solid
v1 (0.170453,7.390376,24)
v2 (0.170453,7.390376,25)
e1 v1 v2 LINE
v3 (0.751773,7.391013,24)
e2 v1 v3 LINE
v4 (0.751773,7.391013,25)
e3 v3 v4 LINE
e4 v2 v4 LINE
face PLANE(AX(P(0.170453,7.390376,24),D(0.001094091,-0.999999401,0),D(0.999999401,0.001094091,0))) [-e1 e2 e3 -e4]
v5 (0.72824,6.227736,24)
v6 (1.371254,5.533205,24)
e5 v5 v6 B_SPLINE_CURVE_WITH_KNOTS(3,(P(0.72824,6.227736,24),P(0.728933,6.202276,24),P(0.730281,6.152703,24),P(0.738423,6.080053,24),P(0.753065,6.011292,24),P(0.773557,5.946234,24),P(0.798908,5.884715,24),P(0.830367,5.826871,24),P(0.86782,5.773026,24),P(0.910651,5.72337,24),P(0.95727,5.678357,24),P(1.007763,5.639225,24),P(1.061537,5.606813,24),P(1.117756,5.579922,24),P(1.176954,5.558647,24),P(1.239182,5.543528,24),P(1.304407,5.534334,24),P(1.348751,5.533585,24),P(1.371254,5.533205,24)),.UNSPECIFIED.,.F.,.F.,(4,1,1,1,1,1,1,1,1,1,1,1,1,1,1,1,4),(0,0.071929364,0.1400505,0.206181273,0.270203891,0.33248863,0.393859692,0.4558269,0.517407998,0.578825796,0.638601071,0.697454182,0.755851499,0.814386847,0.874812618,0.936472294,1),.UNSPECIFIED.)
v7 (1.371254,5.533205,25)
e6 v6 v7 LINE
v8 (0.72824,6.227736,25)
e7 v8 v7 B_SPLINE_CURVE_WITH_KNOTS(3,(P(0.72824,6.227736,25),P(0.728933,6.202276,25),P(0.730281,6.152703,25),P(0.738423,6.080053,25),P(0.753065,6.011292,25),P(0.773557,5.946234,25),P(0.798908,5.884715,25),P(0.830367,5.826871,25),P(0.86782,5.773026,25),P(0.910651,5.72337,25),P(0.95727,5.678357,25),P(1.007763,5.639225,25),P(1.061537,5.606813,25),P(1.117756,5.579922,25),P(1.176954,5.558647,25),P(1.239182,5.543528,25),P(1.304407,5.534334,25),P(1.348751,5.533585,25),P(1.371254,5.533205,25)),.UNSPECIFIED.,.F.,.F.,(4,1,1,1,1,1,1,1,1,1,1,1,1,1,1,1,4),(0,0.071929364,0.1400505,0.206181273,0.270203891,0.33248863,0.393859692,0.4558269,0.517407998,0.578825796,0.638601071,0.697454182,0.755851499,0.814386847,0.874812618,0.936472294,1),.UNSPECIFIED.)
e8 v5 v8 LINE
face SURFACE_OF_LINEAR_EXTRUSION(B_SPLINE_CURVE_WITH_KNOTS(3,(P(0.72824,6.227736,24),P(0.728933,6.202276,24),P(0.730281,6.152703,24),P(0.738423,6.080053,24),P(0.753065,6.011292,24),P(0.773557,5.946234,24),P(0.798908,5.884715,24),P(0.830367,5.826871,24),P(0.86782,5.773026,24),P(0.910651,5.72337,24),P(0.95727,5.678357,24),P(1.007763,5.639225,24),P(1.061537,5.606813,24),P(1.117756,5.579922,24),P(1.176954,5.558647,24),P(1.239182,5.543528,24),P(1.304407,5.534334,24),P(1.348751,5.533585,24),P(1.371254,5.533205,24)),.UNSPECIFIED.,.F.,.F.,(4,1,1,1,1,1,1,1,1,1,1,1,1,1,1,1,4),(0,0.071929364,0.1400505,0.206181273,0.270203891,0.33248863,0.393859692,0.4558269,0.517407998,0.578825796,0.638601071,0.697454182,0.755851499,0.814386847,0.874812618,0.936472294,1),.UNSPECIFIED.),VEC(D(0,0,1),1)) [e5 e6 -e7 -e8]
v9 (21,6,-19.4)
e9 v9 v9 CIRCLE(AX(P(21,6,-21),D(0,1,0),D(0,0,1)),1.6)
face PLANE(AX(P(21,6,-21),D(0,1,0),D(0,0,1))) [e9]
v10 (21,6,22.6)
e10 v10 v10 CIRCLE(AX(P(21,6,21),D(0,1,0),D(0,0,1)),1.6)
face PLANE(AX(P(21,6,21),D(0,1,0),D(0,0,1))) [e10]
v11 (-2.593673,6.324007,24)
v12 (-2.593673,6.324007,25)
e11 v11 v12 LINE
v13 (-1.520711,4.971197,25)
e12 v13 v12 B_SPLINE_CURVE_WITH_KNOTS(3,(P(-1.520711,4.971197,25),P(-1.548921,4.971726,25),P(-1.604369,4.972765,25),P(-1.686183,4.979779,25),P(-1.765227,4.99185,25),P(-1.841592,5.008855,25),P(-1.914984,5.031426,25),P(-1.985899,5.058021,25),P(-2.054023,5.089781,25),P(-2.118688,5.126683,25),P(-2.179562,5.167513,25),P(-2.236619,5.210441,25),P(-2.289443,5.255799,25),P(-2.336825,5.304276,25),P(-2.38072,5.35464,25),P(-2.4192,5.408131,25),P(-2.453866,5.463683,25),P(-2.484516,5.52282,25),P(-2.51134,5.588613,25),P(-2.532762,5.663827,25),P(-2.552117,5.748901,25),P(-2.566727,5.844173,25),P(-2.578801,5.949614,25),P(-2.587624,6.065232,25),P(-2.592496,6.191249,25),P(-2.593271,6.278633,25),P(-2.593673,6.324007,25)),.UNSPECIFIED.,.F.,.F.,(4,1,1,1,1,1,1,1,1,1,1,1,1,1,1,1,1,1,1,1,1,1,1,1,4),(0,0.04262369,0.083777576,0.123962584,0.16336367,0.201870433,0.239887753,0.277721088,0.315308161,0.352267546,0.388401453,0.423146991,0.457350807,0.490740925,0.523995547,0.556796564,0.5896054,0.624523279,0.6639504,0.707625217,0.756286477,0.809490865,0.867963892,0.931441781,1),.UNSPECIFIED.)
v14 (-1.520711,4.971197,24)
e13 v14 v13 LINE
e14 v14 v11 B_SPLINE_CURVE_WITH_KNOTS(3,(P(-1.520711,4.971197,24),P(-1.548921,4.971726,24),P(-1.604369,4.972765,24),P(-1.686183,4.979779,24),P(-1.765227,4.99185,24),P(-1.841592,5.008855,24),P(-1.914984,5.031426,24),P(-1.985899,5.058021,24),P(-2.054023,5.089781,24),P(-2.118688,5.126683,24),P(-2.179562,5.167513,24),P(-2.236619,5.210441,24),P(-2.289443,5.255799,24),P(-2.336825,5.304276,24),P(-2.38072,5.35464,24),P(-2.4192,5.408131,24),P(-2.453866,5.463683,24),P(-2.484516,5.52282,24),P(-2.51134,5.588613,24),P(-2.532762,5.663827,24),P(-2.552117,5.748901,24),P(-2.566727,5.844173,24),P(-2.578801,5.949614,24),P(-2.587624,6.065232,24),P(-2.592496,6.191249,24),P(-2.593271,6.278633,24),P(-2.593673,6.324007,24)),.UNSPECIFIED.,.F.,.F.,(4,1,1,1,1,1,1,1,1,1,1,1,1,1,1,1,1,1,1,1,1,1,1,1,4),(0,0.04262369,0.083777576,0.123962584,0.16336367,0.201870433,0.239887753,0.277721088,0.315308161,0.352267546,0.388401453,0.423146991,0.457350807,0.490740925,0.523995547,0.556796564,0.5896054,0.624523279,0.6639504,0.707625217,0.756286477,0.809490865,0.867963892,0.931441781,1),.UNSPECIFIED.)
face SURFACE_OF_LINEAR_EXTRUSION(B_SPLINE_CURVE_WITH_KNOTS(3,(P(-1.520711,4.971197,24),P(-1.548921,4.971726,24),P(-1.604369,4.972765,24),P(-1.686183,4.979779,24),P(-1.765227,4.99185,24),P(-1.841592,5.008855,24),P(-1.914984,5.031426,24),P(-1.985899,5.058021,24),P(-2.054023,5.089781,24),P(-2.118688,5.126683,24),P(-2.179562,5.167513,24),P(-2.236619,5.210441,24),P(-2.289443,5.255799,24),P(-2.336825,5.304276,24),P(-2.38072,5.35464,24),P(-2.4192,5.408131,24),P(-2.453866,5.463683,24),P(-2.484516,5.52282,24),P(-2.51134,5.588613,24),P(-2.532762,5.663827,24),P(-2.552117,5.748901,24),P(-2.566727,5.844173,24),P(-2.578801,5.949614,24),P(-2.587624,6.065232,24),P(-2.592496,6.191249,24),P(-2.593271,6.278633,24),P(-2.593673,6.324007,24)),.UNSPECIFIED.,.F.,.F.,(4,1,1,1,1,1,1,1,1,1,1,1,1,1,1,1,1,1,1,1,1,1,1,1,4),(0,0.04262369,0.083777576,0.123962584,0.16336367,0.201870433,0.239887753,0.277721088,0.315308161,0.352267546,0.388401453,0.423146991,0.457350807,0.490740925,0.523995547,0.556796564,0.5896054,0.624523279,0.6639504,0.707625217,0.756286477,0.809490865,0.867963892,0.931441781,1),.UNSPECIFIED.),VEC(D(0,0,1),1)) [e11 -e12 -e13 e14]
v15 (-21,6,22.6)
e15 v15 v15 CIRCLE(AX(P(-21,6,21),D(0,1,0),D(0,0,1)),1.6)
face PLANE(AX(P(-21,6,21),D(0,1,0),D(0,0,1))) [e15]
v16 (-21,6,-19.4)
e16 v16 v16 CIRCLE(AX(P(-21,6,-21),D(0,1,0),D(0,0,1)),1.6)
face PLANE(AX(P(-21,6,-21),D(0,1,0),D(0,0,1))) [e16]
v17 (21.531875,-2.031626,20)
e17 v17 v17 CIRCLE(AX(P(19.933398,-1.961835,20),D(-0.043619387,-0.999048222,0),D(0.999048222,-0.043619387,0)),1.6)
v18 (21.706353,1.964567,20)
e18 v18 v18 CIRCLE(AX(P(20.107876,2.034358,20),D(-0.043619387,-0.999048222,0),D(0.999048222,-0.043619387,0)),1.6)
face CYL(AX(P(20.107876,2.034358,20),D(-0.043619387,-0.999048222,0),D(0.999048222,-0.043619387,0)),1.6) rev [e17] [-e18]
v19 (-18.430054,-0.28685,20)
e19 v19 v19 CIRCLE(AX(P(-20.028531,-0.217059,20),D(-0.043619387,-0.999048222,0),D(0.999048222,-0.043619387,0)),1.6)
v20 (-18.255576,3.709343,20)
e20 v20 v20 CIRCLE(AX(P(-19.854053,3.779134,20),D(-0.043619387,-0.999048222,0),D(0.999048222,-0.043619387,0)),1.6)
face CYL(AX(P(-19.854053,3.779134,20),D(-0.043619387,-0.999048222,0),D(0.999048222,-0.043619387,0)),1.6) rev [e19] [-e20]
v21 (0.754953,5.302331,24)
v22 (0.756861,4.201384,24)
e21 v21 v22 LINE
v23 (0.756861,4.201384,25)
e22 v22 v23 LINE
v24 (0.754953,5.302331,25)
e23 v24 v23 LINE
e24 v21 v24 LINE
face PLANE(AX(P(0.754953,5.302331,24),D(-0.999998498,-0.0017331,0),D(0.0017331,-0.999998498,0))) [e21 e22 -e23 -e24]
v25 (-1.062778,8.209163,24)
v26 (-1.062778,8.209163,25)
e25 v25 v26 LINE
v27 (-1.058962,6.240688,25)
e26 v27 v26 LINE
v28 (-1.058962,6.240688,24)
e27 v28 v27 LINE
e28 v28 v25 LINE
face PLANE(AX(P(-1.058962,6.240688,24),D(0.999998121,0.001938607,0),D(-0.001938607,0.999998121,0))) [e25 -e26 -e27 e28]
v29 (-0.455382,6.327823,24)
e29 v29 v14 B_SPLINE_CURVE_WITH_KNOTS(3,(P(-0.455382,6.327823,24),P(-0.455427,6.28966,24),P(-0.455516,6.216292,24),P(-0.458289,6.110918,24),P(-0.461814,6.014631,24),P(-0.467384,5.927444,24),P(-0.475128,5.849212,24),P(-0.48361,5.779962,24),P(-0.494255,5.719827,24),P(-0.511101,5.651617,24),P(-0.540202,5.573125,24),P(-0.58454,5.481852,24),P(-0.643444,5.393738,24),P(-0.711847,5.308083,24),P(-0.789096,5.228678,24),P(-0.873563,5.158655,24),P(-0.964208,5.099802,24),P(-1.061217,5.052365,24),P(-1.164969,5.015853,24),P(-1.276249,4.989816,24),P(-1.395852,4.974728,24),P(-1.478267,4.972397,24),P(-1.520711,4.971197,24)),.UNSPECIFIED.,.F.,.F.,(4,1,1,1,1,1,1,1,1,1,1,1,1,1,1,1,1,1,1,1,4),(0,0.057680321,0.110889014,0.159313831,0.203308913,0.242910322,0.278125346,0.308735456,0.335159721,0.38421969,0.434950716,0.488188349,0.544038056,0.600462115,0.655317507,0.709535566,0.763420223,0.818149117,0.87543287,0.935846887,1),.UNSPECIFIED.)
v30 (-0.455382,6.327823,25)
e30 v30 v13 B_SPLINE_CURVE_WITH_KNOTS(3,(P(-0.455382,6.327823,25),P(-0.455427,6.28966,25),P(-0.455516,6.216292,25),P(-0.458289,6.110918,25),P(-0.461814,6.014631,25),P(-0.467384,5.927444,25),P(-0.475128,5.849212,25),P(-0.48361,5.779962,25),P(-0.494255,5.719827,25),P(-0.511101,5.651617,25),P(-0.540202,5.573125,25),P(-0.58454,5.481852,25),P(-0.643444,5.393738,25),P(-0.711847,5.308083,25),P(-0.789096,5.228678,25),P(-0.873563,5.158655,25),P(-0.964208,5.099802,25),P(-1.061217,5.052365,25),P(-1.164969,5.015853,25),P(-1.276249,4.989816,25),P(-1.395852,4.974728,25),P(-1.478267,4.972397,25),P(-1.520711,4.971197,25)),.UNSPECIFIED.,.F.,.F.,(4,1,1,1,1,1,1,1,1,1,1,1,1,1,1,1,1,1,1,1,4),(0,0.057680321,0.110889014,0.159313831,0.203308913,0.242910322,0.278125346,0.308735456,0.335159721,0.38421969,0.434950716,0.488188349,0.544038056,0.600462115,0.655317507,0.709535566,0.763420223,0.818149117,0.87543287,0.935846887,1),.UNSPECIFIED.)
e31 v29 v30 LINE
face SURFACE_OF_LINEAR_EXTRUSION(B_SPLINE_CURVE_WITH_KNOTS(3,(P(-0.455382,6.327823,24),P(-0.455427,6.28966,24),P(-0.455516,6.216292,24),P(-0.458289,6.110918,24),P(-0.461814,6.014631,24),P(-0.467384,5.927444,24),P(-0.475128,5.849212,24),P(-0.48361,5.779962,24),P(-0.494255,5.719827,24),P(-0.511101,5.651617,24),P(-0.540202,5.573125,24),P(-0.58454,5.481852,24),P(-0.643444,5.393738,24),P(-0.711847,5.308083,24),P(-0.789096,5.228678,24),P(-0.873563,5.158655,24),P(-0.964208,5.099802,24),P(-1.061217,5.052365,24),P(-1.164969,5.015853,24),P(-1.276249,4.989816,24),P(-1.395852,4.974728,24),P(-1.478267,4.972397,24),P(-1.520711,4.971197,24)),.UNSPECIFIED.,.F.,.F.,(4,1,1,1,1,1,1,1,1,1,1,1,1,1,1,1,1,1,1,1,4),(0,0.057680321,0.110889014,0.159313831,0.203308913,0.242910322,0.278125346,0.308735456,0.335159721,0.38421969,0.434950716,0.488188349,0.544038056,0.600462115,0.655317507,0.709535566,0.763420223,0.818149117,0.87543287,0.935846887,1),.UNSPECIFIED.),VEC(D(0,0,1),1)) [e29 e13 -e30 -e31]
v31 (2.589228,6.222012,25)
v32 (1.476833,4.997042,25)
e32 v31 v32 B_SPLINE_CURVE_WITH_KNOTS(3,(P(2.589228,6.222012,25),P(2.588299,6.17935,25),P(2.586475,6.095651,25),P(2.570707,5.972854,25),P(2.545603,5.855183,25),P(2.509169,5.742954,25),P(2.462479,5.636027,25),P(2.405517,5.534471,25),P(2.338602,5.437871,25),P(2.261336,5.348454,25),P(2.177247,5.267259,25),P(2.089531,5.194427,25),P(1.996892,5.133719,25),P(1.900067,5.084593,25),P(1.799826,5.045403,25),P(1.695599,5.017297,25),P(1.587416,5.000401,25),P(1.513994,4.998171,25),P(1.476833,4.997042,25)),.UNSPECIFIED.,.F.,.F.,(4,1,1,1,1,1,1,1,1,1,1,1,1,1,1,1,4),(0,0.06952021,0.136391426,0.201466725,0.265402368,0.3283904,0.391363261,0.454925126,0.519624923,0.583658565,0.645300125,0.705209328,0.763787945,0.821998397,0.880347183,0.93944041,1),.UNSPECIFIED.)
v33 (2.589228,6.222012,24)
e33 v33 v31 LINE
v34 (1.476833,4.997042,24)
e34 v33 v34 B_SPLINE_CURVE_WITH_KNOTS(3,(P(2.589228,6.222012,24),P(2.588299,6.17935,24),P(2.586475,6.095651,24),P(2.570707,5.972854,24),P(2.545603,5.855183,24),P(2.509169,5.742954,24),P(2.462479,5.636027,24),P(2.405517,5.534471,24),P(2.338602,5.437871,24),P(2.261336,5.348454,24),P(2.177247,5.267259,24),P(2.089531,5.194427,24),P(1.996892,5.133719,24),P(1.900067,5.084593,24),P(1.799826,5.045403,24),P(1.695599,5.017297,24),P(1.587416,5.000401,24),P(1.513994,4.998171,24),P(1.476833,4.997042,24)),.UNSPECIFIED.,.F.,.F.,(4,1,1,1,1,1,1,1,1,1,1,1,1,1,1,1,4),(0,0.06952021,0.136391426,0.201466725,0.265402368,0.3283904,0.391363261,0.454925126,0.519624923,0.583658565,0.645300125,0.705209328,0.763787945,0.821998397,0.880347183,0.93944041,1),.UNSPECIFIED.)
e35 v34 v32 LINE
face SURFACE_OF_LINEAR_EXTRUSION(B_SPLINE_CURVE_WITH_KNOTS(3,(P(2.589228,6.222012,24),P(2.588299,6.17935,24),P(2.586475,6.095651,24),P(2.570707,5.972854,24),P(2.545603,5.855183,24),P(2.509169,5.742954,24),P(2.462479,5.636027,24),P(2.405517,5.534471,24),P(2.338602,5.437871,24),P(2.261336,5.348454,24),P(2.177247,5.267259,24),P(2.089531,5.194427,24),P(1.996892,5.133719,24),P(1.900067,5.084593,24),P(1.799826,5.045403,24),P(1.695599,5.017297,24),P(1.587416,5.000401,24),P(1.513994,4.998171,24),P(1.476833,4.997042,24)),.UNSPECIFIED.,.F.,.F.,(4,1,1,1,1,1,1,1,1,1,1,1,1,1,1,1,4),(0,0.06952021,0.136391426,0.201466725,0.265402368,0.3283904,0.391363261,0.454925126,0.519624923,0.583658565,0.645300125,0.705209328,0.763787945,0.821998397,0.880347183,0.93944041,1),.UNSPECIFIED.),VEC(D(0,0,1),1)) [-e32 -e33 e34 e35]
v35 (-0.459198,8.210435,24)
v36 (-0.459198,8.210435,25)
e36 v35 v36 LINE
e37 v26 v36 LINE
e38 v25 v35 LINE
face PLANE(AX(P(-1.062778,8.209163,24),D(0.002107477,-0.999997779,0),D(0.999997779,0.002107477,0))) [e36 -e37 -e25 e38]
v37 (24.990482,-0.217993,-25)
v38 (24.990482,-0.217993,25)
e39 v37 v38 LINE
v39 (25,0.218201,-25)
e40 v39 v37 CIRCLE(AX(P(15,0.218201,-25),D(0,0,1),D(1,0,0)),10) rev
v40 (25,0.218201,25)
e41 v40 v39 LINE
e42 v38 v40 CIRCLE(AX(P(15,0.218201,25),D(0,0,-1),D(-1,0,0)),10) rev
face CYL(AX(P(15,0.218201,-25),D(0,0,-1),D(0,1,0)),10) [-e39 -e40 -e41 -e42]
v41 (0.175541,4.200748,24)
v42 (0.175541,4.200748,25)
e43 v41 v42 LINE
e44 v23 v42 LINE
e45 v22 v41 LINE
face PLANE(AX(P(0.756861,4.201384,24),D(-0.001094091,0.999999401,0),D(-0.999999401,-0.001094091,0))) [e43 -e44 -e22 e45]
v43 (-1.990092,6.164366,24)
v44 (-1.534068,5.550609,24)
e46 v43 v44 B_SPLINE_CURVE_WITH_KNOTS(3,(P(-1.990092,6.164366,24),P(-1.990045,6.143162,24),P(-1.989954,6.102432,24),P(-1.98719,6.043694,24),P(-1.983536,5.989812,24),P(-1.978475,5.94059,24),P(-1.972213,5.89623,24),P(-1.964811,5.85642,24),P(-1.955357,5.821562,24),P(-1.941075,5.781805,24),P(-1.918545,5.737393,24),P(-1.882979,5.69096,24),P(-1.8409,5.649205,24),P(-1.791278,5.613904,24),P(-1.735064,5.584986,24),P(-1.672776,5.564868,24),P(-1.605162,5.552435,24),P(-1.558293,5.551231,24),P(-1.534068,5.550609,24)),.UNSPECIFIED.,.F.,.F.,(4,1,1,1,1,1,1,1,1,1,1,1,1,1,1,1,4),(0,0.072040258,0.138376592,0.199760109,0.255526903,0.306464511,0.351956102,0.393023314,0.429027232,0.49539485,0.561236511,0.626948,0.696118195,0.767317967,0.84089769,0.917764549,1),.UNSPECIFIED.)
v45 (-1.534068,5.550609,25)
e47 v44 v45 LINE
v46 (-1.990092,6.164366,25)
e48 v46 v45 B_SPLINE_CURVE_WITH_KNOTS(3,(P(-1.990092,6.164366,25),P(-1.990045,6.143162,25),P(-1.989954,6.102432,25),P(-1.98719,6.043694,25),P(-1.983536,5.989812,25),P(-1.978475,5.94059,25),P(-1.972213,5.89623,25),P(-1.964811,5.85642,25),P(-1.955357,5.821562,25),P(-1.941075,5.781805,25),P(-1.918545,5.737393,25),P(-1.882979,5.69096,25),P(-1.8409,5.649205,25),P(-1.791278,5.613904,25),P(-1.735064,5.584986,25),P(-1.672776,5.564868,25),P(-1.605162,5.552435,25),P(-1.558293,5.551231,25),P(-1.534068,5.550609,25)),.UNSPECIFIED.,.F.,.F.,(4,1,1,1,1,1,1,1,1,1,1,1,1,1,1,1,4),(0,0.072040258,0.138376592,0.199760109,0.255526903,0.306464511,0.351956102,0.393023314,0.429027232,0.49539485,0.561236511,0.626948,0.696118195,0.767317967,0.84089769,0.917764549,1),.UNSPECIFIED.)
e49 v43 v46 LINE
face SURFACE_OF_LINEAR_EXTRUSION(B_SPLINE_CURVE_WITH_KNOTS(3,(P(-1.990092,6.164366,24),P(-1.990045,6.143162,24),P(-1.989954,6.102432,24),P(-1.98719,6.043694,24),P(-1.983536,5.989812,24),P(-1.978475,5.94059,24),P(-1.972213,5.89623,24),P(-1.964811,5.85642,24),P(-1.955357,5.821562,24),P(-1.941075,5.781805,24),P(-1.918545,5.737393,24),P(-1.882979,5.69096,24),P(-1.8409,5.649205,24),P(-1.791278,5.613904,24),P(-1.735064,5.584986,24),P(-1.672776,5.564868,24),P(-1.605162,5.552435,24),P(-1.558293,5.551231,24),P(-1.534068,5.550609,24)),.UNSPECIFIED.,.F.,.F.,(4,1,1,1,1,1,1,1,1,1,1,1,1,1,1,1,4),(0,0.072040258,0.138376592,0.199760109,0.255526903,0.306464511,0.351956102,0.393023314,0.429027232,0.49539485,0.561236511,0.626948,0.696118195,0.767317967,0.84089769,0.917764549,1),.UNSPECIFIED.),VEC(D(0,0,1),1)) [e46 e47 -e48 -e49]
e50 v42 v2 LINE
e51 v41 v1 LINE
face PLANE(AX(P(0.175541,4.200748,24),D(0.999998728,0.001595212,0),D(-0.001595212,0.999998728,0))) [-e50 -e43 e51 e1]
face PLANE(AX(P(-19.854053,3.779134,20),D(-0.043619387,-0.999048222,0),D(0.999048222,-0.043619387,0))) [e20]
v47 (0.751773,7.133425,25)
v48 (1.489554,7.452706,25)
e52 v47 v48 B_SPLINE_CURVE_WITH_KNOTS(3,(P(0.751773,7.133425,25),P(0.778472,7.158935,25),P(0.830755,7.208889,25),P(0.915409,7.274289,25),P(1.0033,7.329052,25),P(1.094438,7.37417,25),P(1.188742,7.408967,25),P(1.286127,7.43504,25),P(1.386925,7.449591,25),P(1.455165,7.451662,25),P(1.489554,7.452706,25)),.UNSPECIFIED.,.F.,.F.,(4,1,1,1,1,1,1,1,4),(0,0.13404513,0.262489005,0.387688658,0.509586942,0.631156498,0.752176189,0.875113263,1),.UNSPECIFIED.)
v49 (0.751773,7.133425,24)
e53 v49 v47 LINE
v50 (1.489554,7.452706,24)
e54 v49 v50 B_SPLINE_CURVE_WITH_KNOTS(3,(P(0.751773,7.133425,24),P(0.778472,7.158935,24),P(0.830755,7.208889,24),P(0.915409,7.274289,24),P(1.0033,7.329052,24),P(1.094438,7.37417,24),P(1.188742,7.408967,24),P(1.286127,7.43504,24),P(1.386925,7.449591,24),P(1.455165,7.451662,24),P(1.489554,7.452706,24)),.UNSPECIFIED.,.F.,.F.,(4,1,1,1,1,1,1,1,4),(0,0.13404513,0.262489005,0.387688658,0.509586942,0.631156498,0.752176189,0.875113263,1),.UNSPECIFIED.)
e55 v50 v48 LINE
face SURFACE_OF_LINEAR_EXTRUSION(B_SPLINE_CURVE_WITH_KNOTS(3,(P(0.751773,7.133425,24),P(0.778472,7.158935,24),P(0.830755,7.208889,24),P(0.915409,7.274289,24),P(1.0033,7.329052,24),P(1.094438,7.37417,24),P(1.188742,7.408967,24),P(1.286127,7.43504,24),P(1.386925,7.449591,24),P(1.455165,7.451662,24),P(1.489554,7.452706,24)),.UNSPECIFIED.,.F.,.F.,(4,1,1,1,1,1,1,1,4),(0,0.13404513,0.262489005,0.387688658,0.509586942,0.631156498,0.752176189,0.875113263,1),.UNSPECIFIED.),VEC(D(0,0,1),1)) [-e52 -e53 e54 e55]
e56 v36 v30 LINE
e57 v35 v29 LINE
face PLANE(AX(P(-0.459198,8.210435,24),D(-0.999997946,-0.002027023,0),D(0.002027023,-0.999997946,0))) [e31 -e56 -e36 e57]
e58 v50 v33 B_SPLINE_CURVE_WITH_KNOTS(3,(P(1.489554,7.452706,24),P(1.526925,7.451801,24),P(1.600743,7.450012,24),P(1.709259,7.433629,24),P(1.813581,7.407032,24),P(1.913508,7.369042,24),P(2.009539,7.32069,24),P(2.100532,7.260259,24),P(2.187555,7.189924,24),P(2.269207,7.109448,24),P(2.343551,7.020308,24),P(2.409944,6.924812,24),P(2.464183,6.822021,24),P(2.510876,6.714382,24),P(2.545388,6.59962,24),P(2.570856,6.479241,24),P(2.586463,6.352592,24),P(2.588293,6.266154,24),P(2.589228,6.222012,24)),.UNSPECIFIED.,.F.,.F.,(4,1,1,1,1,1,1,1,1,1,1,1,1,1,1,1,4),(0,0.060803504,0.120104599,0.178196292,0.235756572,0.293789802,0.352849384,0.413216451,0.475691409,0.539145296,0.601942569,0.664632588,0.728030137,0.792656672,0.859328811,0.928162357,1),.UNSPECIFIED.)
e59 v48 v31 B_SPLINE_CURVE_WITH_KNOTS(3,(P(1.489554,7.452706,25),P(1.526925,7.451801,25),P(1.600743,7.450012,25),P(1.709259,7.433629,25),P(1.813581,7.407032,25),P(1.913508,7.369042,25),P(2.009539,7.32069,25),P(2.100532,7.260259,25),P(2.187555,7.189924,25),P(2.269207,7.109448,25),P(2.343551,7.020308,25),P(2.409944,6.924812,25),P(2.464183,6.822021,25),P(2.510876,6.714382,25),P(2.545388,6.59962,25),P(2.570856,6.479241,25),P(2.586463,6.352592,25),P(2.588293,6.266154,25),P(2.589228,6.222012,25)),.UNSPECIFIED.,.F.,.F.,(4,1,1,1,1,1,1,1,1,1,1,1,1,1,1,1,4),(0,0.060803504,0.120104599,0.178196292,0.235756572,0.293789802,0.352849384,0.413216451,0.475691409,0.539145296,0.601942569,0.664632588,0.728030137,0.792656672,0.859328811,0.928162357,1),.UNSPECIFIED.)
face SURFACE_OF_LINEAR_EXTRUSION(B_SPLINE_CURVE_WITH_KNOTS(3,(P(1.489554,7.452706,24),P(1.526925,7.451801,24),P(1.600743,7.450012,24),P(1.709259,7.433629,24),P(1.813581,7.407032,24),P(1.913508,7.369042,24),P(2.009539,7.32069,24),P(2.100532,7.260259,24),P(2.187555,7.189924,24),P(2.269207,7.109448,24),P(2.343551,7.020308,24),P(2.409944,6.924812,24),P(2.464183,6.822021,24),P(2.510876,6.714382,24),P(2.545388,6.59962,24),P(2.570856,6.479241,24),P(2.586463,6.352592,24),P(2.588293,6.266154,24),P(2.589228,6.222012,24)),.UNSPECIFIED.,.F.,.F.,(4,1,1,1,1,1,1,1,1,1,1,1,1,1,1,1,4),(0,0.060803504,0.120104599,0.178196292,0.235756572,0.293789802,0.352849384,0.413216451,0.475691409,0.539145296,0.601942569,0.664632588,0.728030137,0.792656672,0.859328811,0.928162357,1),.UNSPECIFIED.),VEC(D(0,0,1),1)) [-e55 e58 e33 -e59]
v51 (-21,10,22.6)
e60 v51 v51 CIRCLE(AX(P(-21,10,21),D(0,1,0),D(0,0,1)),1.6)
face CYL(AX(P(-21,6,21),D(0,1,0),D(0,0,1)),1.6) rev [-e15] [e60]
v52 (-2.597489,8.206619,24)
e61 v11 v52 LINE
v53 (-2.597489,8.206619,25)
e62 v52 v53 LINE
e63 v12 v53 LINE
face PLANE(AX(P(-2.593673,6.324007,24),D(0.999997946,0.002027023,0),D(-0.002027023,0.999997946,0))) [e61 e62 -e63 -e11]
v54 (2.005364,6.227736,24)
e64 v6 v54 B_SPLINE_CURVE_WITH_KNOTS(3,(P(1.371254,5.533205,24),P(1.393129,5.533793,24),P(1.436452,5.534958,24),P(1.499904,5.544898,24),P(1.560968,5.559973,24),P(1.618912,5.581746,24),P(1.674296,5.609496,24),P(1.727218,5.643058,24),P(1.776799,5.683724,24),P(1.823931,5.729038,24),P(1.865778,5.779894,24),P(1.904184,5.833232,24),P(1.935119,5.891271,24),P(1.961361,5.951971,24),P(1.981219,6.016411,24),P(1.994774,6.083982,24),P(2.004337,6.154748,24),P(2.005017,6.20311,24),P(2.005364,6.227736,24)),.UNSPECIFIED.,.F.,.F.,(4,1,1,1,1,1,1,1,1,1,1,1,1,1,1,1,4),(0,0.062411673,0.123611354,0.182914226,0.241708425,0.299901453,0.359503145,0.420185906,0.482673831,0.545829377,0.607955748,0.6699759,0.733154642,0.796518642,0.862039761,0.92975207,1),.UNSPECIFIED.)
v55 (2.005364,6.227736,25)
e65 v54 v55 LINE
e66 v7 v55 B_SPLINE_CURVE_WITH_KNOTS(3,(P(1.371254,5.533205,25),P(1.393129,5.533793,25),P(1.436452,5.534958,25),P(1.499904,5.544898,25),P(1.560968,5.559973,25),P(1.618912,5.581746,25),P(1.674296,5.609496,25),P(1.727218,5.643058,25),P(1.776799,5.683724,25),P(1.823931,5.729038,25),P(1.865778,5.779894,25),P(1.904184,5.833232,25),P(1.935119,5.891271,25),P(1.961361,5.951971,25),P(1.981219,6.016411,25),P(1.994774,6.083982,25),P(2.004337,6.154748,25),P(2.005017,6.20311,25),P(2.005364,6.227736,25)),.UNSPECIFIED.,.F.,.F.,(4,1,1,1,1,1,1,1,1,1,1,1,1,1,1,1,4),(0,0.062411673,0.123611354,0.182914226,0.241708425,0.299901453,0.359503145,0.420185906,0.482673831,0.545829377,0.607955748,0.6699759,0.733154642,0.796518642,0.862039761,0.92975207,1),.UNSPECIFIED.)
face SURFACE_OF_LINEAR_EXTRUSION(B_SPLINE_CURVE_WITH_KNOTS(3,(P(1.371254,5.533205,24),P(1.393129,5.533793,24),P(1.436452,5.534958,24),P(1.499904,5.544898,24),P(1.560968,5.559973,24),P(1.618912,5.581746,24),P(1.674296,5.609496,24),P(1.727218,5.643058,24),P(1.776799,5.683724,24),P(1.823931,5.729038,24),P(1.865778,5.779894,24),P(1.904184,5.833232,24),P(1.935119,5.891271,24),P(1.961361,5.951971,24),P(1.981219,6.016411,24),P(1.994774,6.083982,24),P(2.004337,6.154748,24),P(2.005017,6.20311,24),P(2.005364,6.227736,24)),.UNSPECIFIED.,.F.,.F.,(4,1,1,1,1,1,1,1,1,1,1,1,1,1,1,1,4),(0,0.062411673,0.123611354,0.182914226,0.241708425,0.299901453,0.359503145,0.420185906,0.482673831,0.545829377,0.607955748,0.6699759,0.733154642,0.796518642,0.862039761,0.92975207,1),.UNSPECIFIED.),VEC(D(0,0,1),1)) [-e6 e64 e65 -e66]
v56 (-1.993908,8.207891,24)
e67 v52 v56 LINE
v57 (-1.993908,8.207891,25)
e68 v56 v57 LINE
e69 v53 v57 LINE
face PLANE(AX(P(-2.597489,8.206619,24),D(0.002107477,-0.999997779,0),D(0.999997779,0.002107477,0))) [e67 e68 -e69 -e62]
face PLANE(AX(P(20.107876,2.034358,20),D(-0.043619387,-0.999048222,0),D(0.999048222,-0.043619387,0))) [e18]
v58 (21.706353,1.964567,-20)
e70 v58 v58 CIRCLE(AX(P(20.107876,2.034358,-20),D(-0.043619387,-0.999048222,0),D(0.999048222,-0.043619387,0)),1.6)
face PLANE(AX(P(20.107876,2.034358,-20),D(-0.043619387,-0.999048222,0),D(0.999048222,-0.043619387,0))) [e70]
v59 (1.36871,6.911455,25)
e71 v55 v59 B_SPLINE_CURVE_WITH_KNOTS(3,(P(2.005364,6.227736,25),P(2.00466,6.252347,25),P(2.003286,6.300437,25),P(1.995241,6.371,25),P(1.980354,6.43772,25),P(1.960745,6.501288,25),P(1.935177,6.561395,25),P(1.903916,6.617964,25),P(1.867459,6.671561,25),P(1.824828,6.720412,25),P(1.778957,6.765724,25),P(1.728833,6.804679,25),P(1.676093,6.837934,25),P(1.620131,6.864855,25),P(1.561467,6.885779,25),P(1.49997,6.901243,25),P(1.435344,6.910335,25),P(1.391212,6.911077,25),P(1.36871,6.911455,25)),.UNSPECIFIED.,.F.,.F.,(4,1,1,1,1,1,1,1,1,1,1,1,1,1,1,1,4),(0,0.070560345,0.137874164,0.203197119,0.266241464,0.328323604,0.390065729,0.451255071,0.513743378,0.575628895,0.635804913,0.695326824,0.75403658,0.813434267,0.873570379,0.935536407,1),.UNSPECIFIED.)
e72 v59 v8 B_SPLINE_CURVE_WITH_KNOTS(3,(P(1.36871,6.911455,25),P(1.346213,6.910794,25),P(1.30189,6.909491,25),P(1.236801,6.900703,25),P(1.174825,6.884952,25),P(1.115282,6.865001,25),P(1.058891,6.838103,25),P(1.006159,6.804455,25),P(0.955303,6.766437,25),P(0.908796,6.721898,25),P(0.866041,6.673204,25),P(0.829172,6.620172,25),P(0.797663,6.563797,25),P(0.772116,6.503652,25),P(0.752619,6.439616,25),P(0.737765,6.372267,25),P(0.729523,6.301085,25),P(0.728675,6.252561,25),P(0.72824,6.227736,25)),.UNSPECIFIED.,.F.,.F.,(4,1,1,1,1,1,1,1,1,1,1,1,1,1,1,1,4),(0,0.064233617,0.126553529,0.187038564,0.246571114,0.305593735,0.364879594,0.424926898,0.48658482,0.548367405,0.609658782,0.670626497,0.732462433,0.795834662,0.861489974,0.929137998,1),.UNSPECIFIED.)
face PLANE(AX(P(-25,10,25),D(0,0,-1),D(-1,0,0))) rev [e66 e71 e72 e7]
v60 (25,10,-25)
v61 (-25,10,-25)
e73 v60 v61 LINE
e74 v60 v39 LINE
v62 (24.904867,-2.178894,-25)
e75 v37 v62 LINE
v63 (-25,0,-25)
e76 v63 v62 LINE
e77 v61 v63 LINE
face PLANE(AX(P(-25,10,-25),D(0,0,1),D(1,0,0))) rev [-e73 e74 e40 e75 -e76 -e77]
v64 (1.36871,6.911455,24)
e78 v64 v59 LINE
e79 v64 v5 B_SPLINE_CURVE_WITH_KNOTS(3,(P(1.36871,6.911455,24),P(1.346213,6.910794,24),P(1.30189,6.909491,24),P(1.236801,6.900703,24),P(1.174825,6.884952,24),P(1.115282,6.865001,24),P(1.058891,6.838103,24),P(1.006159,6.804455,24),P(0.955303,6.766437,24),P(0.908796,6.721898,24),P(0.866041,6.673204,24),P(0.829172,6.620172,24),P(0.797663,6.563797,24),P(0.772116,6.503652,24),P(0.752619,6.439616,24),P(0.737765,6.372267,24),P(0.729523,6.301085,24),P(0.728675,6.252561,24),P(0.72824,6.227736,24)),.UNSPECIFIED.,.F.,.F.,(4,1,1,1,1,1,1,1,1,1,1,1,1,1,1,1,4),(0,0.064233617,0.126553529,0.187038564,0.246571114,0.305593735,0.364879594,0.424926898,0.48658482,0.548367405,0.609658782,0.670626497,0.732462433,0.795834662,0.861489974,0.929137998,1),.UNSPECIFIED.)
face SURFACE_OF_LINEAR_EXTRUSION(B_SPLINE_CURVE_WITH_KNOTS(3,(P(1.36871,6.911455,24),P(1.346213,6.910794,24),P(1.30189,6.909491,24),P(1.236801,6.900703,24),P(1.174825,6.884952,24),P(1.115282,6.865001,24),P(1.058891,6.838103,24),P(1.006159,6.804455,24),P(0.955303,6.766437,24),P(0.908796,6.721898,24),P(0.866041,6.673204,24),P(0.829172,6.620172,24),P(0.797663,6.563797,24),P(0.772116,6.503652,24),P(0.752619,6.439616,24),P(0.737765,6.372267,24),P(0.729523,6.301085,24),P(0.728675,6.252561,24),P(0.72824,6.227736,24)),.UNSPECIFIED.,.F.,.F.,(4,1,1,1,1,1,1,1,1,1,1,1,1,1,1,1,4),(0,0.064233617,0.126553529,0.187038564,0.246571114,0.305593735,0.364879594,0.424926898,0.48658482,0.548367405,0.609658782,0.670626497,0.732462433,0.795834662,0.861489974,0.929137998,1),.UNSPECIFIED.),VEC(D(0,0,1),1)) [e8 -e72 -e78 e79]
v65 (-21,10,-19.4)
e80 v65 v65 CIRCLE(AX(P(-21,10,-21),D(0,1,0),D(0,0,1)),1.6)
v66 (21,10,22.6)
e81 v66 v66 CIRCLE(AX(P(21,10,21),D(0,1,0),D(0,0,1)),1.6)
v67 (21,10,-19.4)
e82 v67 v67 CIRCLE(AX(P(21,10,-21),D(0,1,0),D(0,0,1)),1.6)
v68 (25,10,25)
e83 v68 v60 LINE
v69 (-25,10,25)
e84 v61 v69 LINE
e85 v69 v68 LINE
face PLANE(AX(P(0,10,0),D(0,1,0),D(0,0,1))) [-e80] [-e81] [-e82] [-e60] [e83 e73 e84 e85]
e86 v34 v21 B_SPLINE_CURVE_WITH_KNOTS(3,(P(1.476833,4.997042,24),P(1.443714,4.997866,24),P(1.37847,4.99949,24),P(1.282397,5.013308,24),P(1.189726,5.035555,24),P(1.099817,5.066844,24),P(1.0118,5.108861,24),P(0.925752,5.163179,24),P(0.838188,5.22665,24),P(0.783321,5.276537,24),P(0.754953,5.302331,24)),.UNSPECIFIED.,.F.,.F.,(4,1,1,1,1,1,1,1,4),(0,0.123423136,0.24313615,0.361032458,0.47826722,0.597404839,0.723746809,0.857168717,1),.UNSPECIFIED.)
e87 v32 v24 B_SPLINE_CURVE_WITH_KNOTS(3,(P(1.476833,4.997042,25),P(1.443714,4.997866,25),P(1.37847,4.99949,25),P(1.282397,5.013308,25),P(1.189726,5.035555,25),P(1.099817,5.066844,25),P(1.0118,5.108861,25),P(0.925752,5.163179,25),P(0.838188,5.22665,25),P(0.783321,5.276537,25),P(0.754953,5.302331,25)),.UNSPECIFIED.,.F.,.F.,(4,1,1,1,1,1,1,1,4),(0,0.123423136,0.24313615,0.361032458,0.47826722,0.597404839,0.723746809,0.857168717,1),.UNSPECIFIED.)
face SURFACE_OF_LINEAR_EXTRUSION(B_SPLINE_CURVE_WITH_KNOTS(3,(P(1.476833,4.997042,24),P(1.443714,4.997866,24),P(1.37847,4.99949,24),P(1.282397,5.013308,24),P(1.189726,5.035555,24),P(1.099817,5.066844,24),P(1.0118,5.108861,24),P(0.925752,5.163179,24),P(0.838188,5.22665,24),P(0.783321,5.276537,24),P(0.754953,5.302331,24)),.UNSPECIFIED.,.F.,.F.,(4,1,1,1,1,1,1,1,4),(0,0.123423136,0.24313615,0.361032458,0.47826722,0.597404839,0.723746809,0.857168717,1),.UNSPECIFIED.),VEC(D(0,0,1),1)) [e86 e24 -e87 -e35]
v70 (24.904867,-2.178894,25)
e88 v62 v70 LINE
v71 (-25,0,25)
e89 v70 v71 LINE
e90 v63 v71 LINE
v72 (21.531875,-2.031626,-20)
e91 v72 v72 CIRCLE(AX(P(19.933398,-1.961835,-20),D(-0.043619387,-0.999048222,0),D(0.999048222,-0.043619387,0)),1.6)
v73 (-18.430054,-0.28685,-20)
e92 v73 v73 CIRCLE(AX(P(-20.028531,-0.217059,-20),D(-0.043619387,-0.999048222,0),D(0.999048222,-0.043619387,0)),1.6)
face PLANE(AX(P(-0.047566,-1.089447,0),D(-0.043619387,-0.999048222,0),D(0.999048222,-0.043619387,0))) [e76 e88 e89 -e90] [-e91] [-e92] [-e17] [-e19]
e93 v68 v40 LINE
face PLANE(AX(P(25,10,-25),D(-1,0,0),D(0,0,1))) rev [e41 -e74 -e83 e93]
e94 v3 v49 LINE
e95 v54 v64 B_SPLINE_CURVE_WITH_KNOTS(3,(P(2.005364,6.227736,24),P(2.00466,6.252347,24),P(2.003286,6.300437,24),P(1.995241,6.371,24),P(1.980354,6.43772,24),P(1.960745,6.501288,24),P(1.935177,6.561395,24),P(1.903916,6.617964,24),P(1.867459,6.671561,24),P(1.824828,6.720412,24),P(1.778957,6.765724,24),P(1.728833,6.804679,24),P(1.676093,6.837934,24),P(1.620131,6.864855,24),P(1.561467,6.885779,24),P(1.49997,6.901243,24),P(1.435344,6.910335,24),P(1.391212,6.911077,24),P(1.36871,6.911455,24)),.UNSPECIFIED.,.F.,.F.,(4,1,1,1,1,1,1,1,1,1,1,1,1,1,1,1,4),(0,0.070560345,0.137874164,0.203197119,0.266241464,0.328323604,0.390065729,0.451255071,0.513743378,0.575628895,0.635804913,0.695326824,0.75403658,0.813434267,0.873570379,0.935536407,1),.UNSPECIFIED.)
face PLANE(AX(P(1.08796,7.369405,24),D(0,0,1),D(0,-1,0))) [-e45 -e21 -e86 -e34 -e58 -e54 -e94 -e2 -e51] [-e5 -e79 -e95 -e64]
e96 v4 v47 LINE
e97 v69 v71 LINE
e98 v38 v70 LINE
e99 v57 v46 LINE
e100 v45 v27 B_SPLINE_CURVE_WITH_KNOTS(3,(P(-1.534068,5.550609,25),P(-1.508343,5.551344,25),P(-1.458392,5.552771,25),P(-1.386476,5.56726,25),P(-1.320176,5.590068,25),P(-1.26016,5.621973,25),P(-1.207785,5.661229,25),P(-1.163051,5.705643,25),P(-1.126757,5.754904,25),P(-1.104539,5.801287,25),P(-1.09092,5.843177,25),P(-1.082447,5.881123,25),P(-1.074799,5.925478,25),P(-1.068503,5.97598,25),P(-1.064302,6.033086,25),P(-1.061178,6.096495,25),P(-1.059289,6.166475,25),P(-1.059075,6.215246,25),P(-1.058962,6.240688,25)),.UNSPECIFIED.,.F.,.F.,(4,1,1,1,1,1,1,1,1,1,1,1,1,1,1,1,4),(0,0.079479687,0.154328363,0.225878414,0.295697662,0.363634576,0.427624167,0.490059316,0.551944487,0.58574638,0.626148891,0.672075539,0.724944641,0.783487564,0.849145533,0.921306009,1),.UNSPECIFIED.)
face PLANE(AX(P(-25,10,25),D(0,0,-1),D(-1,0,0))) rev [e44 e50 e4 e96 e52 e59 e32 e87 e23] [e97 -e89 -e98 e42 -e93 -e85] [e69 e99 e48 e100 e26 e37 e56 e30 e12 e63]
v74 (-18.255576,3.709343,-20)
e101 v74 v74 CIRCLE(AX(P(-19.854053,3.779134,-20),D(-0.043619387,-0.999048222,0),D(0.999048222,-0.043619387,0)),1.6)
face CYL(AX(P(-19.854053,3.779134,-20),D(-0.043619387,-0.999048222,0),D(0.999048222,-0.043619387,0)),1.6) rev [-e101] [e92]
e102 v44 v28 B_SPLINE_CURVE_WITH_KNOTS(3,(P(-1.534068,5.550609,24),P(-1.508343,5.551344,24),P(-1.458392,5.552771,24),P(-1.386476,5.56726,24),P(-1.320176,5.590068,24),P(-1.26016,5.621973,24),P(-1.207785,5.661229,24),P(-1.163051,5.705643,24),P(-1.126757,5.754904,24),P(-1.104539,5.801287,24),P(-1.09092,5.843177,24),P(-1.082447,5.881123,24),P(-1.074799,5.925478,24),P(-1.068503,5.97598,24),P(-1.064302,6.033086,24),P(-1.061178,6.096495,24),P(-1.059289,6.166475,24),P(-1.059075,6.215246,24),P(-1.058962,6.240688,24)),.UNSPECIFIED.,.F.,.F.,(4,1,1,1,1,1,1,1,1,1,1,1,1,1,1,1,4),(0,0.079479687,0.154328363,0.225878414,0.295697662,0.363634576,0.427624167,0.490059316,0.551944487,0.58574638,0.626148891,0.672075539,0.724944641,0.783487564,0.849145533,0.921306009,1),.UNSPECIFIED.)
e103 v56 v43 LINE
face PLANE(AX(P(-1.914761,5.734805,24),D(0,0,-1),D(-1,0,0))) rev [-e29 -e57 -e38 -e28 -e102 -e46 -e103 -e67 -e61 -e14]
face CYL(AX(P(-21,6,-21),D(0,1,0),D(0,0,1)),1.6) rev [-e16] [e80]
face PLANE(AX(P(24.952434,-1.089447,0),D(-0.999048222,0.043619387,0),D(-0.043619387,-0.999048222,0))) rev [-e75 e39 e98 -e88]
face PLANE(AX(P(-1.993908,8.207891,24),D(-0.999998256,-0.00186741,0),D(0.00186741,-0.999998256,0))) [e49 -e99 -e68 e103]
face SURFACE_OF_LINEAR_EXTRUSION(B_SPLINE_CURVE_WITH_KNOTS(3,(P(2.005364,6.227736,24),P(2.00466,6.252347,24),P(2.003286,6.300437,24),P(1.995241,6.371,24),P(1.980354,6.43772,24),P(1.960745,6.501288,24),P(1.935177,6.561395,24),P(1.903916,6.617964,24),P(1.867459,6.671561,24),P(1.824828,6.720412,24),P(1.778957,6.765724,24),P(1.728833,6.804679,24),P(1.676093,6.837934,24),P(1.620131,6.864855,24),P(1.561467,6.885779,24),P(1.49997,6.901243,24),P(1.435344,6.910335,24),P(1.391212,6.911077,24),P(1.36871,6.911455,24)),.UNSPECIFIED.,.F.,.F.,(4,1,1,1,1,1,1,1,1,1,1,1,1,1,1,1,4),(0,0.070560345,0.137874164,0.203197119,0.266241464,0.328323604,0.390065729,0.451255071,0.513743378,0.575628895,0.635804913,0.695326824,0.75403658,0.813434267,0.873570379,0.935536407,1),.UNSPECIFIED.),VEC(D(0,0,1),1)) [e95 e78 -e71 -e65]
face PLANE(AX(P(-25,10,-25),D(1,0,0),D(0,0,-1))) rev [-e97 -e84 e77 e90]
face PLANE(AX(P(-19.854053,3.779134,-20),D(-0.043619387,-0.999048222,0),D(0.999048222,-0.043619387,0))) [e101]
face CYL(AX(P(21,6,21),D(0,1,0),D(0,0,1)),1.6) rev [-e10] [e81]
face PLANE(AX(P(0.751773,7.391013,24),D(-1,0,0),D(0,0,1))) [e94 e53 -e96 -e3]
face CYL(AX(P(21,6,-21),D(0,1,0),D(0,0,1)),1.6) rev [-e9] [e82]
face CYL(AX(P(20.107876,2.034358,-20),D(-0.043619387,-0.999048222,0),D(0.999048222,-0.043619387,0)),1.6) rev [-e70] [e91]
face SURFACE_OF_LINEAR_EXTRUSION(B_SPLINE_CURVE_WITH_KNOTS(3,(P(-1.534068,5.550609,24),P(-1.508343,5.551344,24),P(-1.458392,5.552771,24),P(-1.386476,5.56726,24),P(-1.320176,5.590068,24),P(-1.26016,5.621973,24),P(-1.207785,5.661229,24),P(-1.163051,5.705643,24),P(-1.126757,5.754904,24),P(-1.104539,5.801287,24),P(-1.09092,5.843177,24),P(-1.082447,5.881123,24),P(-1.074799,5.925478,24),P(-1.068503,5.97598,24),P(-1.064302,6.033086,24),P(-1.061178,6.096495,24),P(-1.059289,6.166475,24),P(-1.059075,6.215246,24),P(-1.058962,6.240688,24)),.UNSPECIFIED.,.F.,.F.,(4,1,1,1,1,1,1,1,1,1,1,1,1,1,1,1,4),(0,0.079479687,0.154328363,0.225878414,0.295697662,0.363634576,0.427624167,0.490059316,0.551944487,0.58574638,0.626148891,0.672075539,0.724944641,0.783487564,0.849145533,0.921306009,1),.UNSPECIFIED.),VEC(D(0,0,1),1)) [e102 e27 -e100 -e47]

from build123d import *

# Parameters (mm, degrees)
SKETCH1_W           = 50
SKETCH1_H           = 50
BOSS_EXTRUDE1_DEPTH = 10
LOFT1_START         = -25
LOFT1_DEPTH         = 50
SKETCH4_R           = 1.6
CUT_EXTRUDE1_DEPTH  = 4
SKETCH6_R           = 1.6
CUT_EXTRUDE2_DEPTH  = 4
FILLET1_R           = 10
CUT_EXTRUDE4_DEPTH  = 1


# Read off the part's stored shape, not the designer's step: Loft1
with BuildPart() as part:
    # Sketch1 → Boss-Extrude1 (new body)
    with BuildSketch(Plane(origin=(0, 0, 0), x_dir=(1, 0, 0), z_dir=(0, 1, 0))):
        Rectangle(SKETCH1_W, SKETCH1_H)
    extrude(amount=BOSS_EXTRUDE1_DEPTH)

    # Loft1 outline → Loft1 (add)
    with BuildSketch(Plane.XY.offset(LOFT1_START)):
        Polygon((25, 0), (-25, 0), (24.904867452, -2.178893569), align=None)
    extrude(amount=LOFT1_DEPTH)

    # Sketch4 → Cut-Extrude1 (cut)
    with BuildSketch(Plane(origin=(-0.047566274, -1.089446784, 0), x_dir=(0.9990482215818578, -0.043619387365336104, 0), z_dir=(-0.043619387365336104, -0.9990482215818578, 0))):
        with Locations((20, 20)):
            Circle(SKETCH4_R)
        with Locations((20, -20)):
            Circle(SKETCH4_R)
        with Locations((-20, -20)):
            Circle(SKETCH4_R)
        with Locations((-20, 20)):
            Circle(SKETCH4_R)
    extrude(amount=-CUT_EXTRUDE1_DEPTH, mode=Mode.SUBTRACT)

    # Sketch6 → Cut-Extrude2 (cut)
    with BuildSketch(Plane(origin=(0, 10, 0), x_dir=(1, 0, 0), z_dir=(0, 1, 0))):
        with Locations(Location((21, 21, 0), (0, 0, 270))):
            Circle(SKETCH6_R)
        with Locations(Location((21, -21, 0), (0, 0, 270))):
            Circle(SKETCH6_R)
        with Locations(Location((-21, -21, 0), (0, 0, 270))):
            Circle(SKETCH6_R)
        with Locations(Location((-21, 21, 0), (0, 0, 270))):
            Circle(SKETCH6_R)
    extrude(amount=-CUT_EXTRUDE2_DEPTH, mode=Mode.SUBTRACT)

    # Fillet1
    # the kernel refuses this fillet: 10 mm, written as the material it takes off along each edge
    with BuildSketch(Plane(origin=(25, 0, -25.545501942), x_dir=(0, 1, 0), z_dir=(0, 0, 1))) as fillet1_piece_1:
        with BuildLine():
            CenterArc((FILLET1_R * 0.0218200776863, FILLET1_R), FILLET1_R, 267.499999993, 2.500000007)
            Line((-FILLET1_R * 0.0217993098072, FILLET1_R * 0.00095177842374), (0, 0))
            Line((0, 0), (FILLET1_R * 0.0218200776863, 0))
        make_face()
    extrude(amount=51.091003884, mode=Mode.SUBTRACT)

    # Sketch8 → Cut-Extrude4 (cut)
    # profile 1 of 2: a face of its own
    with BuildSketch(Plane.XY.offset(25)):
        with BuildLine():
            Line((-2.597489017, 8.20661879), (-1.993908288, 8.207890825))
            Line((-1.993908288, 8.207890825), (-1.990092182, 6.164366186))
            add(Edge.make_bspline(
                [(-1.990092182, 6.164366186), (-1.990044981, 6.143161949), (-1.989954316, 6.102432362), (-1.98719006, 6.043693532), (-1.983535675, 5.989812448), (-1.978474748, 5.940590206), (-1.972213443, 5.896230054), (-1.964810654, 5.856420037), (-1.955356589, 5.821562302), (-1.941074869, 5.781805473), (-1.918545267, 5.737393222), (-1.88297912, 5.690959505), (-1.840900192, 5.649204853), (-1.791278495, 5.613903537), (-1.735063778, 5.584986173), (-1.672775576, 5.56486761), (-1.605162185, 5.552435164), (-1.558292927, 5.551231377), (-1.534067542, 5.550609174)],
                knots=[0, 0, 0, 0, 1.152644125, 2.214025477, 3.196161738, 4.088430453, 4.903432181, 5.631297626, 6.288373025, 6.86443571, 7.926317597, 8.979784177, 10.031167994, 11.137891127, 12.27708747, 13.454363037, 14.684232779, 16, 16, 16, 16], degree=3))
            add(Edge.make_bspline(
                [(-1.534067542, 5.550609174), (-1.508342778, 5.551344218), (-1.458392144, 5.552771477), (-1.38647613, 5.567260105), (-1.320175779, 5.590067607), (-1.260159607, 5.621972608), (-1.207784977, 5.661229411), (-1.163051106, 5.705642718), (-1.126756521, 5.754903538), (-1.104539344, 5.801287384), (-1.090919789, 5.843176805), (-1.082446638, 5.881122654), (-1.074798653, 5.925478097), (-1.068502962, 5.975979624), (-1.064302042, 6.033085663), (-1.061178272, 6.096494834), (-1.059289451, 6.166474936), (-1.059074503, 6.215246414), (-1.058962374, 6.240688301)],
                knots=[0, 0, 0, 0, 1.271674988, 2.469253807, 3.614054625, 4.731162594, 5.818153213, 6.841986676, 7.840949062, 8.831111795, 9.371942087, 10.018382253, 10.75320863, 11.599114249, 12.535801032, 13.586328523, 14.740896136, 16, 16, 16, 16], degree=3))
            Line((-1.058962374, 6.240688301), (-1.06277848, 8.20916286))
            Line((-1.06277848, 8.20916286), (-0.459197751, 8.210434896))
            Line((-0.459197751, 8.210434896), (-0.455381645, 6.327822716))
            add(Edge.make_bspline(
                [(-0.455381645, 6.327822716), (-0.455427497, 6.289659556), (-0.455515647, 6.21629181), (-0.458289071, 6.110918126), (-0.461814303, 6.014630937), (-0.467384408, 5.927444116), (-0.475128208, 5.849211971), (-0.483609602, 5.779962438), (-0.494254852, 5.719827409), (-0.511101496, 5.651616734), (-0.540202063, 5.573125016), (-0.584540214, 5.481851601), (-0.643443749, 5.393738081), (-0.711846857, 5.308083315), (-0.789095734, 5.22867752), (-0.873562656, 5.158654821), (-0.964207697, 5.099802482), (-1.061217352, 5.05236512), (-1.164968764, 5.015852552), (-1.276248979, 4.989816387), (-1.395852353, 4.974728231), (-1.478266961, 4.972397474), (-1.520711172, 4.971197115)],
                knots=[0, 0, 0, 0, 1.153606413, 2.21778028, 3.186276612, 4.066178262, 4.858206436, 5.562506921, 6.174709129, 6.703194428, 7.684393792, 8.699014322, 9.763766974, 10.880761115, 12.0092423, 13.106350137, 14.190711311, 15.268404456, 16.362982341, 17.508657393, 18.716937746, 20, 20, 20, 20], degree=3))
            add(Edge.make_bspline(
                [(-1.520711172, 4.971197115), (-1.548921319, 4.971725785), (-1.604368835, 4.972764896), (-1.686183271, 4.979779), (-1.765227448, 4.991850187), (-1.841591746, 5.008854994), (-1.914983671, 5.031425855), (-1.98589913, 5.05802141), (-2.054022722, 5.089780937), (-2.118688428, 5.126683391), (-2.179562073, 5.167512676), (-2.236618712, 5.210440833), (-2.289443467, 5.255799025), (-2.336824872, 5.304275742), (-2.38072026, 5.354640261), (-2.419200428, 5.408131493), (-2.453865888, 5.463682585), (-2.484516032, 5.522820121), (-2.511340089, 5.588612717), (-2.532761656, 5.663826937), (-2.552116951, 5.748901286), (-2.566727329, 5.844173393), (-2.578801096, 5.949614065), (-2.58762407, 6.065232271), (-2.592496247, 6.191248581), (-2.593270756, 6.278633173), (-2.593672911, 6.32400661)],
                knots=[0, 0, 0, 0, 1.02296857, 2.010661828, 2.975102012, 3.920728081, 4.844890381, 5.757306083, 6.665306112, 7.567395873, 8.454421116, 9.321634866, 10.155527794, 10.976419367, 11.777782189, 12.575893134, 13.363117526, 14.150529598, 14.988558697, 15.934809602, 16.983005217, 18.150875452, 19.427780756, 20.831133413, 22.354602744, 24, 24, 24, 24], degree=3))
            Line((-2.593672911, 6.32400661), (-2.597489017, 8.20661879))
        make_face()
    # profile 2 of 2: a face of its own
    with BuildSketch(Plane.XY.offset(25)):
        with BuildLine():
            Line((0.751773127, 7.391012504), (0.751773127, 7.133425365))
            add(Edge.make_bspline(
                [(0.751773127, 7.133425365), (0.778472329, 7.158935271), (0.83075507, 7.208889119), (0.91540949, 7.274289424), (1.003299732, 7.329052484), (1.094438334, 7.374170373), (1.188742293, 7.408966836), (1.286127124, 7.435040483), (1.386924841, 7.449591081), (1.455165046, 7.451662404), (1.489553576, 7.452706214)],
                knots=[0, 0, 0, 0, 1.07236104, 2.099912038, 3.101509264, 4.076695536, 5.049251982, 6.017409511, 7.000906107, 8, 8, 8, 8], degree=3))
            add(Edge.make_bspline(
                [(1.489553576, 7.452706214), (1.526924592, 7.451800756), (1.600743213, 7.450012213), (1.709259158, 7.433628514), (1.813580931, 7.40703223), (1.913508294, 7.369042139), (2.009538866, 7.32069025), (2.100531928, 7.260258837), (2.187555401, 7.189924161), (2.269207456, 7.10944842), (2.34355068, 7.020307883), (2.409944412, 6.92481222), (2.464182597, 6.822021375), (2.510876223, 6.7143822), (2.545388061, 6.599620476), (2.570855741, 6.479240849), (2.586463156, 6.352591682), (2.588293394, 6.266153935), (2.589228055, 6.222012103)],
                knots=[0, 0, 0, 0, 0.97285607, 1.921673578, 2.851140669, 3.772105152, 4.700636827, 5.645590137, 6.611463219, 7.611062552, 8.626324728, 9.631081099, 10.634121403, 11.648482193, 12.682506745, 13.749260973, 14.85059771, 16, 16, 16, 16], degree=3))
            add(Edge.make_bspline(
                [(2.589228055, 6.222012103), (2.588298537, 6.179349915), (2.586474919, 6.095651135), (2.570706926, 5.972853752), (2.545603057, 5.855183022), (2.509168603, 5.742953987), (2.462478649, 5.636026689), (2.405516744, 5.534470889), (2.338601572, 5.437871439), (2.261335844, 5.348453672), (2.177246838, 5.267258834), (2.089530639, 5.194426949), (1.996891996, 5.133719372), (1.900067324, 5.084592613), (1.799825884, 5.045403376), (1.695598692, 5.017296578), (1.58741629, 5.000400903), (1.513994179, 4.998170845), (1.476833223, 4.997042151)],
                knots=[0, 0, 0, 0, 1.112323361, 2.182262823, 3.223467608, 4.246437882, 5.254246404, 6.261812182, 7.278802008, 8.313998772, 9.338537047, 10.324801996, 11.283349242, 12.220607119, 13.15197435, 14.085554928, 15.031046561, 16, 16, 16, 16], degree=3))
            add(Edge.make_bspline(
                [(1.476833223, 4.997042151), (1.443713635, 4.997866298), (1.37847004, 4.999489817), (1.28239675, 5.013308287), (1.18972649, 5.035554908), (1.099816742, 5.066844085), (1.011800444, 5.108860697), (0.925752316, 5.163179132), (0.838187871, 5.226650427), (0.783321035, 5.276537488), (0.754953215, 5.302330613)],
                knots=[0, 0, 0, 0, 0.987385084, 1.945089202, 2.888259662, 3.826137757, 4.779238709, 5.78997447, 6.857349733, 8, 8, 8, 8], degree=3))
            Line((0.754953215, 5.302330613), (0.756861268, 4.201384099))
            Line((0.756861268, 4.201384099), (0.175541156, 4.200748081))
            Line((0.175541156, 4.200748081), (0.170453015, 7.390376486))
            Line((0.170453015, 7.390376486), (0.751773127, 7.391012504))
        make_face()
        with BuildLine():
            add(Edge.make_bspline(
                [(1.368710227, 6.911455212), (1.346213252, 6.910793906), (1.301889553, 6.909490995), (1.236800882, 6.900703018), (1.174825335, 6.884952495), (1.115281841, 6.865000801), (1.058891287, 6.838102927), (1.006158968, 6.804454728), (0.955302726, 6.766437156), (0.908795742, 6.721898104), (0.866041178, 6.673203682), (0.829171668, 6.620171725), (0.797662517, 6.563797157), (0.772116057, 6.503651781), (0.752619184, 6.439615962), (0.737765481, 6.372266556), (0.7295235, 6.301085467), (0.728674715, 6.252561314), (0.728240475, 6.227736262)],
                knots=[0, 0, 0, 0, 1.027737872, 2.024856463, 2.992617016, 3.945137832, 4.889499754, 5.838073507, 6.798830374, 7.785357117, 8.773878476, 9.754540506, 10.730023958, 11.719398922, 12.733354597, 13.783839577, 14.866207966, 16, 16, 16, 16], degree=3))
            add(Edge.make_bspline(
                [(0.728240475, 6.227736262), (0.728932743, 6.202275745), (0.730280627, 6.152702693), (0.738422537, 6.08005334), (0.75306485, 6.011292092), (0.773556922, 5.946234461), (0.798907779, 5.884714778), (0.830366781, 5.826871472), (0.867820106, 5.773025683), (0.91065126, 5.723370351), (0.95726968, 5.678357076), (1.007763484, 5.639224622), (1.06153695, 5.6068128), (1.1177563, 5.579922387), (1.176954499, 5.558646747), (1.239181745, 5.543528138), (1.30440737, 5.534333858), (1.348751423, 5.533585019), (1.371254297, 5.533205012)],
                knots=[0, 0, 0, 0, 1.150869826, 2.240808007, 3.29890037, 4.323262251, 5.319818076, 6.30175507, 7.2932304, 8.278527964, 9.261212744, 10.217617135, 11.159266914, 12.093623991, 13.030189547, 13.99700188, 14.983556707, 16, 16, 16, 16], degree=3))
            add(Edge.make_bspline(
                [(1.371254297, 5.533205012), (1.393128622, 5.533793245), (1.436452488, 5.534958287), (1.499904241, 5.544898072), (1.560968418, 5.559972722), (1.618912299, 5.581746332), (1.674296494, 5.609496131), (1.727218439, 5.643057943), (1.776798655, 5.683723983), (1.823930937, 5.729037604), (1.865777732, 5.77989361), (1.904183947, 5.833232179), (1.935119368, 5.891270601), (1.961360615, 5.951971312), (1.981219465, 6.016410897), (1.994773785, 6.083982305), (2.004336984, 6.154747505), (2.005017408, 6.203110383), (2.005363872, 6.227736262)],
                knots=[0, 0, 0, 0, 0.998586769, 1.977781659, 2.926627622, 3.867334799, 4.798423245, 5.752050313, 6.722974502, 7.722781292, 8.733270033, 9.727291971, 10.719614403, 11.730474272, 12.744298273, 13.79263617, 14.876033113, 16, 16, 16, 16], degree=3))
            add(Edge.make_bspline(
                [(2.005363872, 6.227736262), (2.004660421, 6.252347386), (2.003285885, 6.300437262), (1.995240688, 6.371000149), (1.980354194, 6.437720012), (1.960745423, 6.50128771), (1.935176776, 6.561395106), (1.903915874, 6.617963719), (1.867459395, 6.6715612), (1.824828199, 6.720411759), (1.778956571, 6.765724093), (1.728833044, 6.804678965), (1.676093164, 6.83793361), (1.620131268, 6.864855463), (1.561466804, 6.885779245), (1.499970245, 6.901242858), (1.435343762, 6.910334609), (1.391212006, 6.911076791), (1.368710227, 6.911455212)],
                knots=[0, 0, 0, 0, 1.128965526, 2.20598662, 3.251153905, 4.259863426, 5.253177665, 6.241051661, 7.220081141, 8.219894056, 9.210062323, 10.172878603, 11.125229178, 12.064585276, 13.014948265, 13.977126056, 14.968582519, 16, 16, 16, 16], degree=3))
        make_face(mode=Mode.SUBTRACT)
    extrude(amount=-CUT_EXTRUDE4_DEPTH, mode=Mode.SUBTRACT)


solid = part.part
